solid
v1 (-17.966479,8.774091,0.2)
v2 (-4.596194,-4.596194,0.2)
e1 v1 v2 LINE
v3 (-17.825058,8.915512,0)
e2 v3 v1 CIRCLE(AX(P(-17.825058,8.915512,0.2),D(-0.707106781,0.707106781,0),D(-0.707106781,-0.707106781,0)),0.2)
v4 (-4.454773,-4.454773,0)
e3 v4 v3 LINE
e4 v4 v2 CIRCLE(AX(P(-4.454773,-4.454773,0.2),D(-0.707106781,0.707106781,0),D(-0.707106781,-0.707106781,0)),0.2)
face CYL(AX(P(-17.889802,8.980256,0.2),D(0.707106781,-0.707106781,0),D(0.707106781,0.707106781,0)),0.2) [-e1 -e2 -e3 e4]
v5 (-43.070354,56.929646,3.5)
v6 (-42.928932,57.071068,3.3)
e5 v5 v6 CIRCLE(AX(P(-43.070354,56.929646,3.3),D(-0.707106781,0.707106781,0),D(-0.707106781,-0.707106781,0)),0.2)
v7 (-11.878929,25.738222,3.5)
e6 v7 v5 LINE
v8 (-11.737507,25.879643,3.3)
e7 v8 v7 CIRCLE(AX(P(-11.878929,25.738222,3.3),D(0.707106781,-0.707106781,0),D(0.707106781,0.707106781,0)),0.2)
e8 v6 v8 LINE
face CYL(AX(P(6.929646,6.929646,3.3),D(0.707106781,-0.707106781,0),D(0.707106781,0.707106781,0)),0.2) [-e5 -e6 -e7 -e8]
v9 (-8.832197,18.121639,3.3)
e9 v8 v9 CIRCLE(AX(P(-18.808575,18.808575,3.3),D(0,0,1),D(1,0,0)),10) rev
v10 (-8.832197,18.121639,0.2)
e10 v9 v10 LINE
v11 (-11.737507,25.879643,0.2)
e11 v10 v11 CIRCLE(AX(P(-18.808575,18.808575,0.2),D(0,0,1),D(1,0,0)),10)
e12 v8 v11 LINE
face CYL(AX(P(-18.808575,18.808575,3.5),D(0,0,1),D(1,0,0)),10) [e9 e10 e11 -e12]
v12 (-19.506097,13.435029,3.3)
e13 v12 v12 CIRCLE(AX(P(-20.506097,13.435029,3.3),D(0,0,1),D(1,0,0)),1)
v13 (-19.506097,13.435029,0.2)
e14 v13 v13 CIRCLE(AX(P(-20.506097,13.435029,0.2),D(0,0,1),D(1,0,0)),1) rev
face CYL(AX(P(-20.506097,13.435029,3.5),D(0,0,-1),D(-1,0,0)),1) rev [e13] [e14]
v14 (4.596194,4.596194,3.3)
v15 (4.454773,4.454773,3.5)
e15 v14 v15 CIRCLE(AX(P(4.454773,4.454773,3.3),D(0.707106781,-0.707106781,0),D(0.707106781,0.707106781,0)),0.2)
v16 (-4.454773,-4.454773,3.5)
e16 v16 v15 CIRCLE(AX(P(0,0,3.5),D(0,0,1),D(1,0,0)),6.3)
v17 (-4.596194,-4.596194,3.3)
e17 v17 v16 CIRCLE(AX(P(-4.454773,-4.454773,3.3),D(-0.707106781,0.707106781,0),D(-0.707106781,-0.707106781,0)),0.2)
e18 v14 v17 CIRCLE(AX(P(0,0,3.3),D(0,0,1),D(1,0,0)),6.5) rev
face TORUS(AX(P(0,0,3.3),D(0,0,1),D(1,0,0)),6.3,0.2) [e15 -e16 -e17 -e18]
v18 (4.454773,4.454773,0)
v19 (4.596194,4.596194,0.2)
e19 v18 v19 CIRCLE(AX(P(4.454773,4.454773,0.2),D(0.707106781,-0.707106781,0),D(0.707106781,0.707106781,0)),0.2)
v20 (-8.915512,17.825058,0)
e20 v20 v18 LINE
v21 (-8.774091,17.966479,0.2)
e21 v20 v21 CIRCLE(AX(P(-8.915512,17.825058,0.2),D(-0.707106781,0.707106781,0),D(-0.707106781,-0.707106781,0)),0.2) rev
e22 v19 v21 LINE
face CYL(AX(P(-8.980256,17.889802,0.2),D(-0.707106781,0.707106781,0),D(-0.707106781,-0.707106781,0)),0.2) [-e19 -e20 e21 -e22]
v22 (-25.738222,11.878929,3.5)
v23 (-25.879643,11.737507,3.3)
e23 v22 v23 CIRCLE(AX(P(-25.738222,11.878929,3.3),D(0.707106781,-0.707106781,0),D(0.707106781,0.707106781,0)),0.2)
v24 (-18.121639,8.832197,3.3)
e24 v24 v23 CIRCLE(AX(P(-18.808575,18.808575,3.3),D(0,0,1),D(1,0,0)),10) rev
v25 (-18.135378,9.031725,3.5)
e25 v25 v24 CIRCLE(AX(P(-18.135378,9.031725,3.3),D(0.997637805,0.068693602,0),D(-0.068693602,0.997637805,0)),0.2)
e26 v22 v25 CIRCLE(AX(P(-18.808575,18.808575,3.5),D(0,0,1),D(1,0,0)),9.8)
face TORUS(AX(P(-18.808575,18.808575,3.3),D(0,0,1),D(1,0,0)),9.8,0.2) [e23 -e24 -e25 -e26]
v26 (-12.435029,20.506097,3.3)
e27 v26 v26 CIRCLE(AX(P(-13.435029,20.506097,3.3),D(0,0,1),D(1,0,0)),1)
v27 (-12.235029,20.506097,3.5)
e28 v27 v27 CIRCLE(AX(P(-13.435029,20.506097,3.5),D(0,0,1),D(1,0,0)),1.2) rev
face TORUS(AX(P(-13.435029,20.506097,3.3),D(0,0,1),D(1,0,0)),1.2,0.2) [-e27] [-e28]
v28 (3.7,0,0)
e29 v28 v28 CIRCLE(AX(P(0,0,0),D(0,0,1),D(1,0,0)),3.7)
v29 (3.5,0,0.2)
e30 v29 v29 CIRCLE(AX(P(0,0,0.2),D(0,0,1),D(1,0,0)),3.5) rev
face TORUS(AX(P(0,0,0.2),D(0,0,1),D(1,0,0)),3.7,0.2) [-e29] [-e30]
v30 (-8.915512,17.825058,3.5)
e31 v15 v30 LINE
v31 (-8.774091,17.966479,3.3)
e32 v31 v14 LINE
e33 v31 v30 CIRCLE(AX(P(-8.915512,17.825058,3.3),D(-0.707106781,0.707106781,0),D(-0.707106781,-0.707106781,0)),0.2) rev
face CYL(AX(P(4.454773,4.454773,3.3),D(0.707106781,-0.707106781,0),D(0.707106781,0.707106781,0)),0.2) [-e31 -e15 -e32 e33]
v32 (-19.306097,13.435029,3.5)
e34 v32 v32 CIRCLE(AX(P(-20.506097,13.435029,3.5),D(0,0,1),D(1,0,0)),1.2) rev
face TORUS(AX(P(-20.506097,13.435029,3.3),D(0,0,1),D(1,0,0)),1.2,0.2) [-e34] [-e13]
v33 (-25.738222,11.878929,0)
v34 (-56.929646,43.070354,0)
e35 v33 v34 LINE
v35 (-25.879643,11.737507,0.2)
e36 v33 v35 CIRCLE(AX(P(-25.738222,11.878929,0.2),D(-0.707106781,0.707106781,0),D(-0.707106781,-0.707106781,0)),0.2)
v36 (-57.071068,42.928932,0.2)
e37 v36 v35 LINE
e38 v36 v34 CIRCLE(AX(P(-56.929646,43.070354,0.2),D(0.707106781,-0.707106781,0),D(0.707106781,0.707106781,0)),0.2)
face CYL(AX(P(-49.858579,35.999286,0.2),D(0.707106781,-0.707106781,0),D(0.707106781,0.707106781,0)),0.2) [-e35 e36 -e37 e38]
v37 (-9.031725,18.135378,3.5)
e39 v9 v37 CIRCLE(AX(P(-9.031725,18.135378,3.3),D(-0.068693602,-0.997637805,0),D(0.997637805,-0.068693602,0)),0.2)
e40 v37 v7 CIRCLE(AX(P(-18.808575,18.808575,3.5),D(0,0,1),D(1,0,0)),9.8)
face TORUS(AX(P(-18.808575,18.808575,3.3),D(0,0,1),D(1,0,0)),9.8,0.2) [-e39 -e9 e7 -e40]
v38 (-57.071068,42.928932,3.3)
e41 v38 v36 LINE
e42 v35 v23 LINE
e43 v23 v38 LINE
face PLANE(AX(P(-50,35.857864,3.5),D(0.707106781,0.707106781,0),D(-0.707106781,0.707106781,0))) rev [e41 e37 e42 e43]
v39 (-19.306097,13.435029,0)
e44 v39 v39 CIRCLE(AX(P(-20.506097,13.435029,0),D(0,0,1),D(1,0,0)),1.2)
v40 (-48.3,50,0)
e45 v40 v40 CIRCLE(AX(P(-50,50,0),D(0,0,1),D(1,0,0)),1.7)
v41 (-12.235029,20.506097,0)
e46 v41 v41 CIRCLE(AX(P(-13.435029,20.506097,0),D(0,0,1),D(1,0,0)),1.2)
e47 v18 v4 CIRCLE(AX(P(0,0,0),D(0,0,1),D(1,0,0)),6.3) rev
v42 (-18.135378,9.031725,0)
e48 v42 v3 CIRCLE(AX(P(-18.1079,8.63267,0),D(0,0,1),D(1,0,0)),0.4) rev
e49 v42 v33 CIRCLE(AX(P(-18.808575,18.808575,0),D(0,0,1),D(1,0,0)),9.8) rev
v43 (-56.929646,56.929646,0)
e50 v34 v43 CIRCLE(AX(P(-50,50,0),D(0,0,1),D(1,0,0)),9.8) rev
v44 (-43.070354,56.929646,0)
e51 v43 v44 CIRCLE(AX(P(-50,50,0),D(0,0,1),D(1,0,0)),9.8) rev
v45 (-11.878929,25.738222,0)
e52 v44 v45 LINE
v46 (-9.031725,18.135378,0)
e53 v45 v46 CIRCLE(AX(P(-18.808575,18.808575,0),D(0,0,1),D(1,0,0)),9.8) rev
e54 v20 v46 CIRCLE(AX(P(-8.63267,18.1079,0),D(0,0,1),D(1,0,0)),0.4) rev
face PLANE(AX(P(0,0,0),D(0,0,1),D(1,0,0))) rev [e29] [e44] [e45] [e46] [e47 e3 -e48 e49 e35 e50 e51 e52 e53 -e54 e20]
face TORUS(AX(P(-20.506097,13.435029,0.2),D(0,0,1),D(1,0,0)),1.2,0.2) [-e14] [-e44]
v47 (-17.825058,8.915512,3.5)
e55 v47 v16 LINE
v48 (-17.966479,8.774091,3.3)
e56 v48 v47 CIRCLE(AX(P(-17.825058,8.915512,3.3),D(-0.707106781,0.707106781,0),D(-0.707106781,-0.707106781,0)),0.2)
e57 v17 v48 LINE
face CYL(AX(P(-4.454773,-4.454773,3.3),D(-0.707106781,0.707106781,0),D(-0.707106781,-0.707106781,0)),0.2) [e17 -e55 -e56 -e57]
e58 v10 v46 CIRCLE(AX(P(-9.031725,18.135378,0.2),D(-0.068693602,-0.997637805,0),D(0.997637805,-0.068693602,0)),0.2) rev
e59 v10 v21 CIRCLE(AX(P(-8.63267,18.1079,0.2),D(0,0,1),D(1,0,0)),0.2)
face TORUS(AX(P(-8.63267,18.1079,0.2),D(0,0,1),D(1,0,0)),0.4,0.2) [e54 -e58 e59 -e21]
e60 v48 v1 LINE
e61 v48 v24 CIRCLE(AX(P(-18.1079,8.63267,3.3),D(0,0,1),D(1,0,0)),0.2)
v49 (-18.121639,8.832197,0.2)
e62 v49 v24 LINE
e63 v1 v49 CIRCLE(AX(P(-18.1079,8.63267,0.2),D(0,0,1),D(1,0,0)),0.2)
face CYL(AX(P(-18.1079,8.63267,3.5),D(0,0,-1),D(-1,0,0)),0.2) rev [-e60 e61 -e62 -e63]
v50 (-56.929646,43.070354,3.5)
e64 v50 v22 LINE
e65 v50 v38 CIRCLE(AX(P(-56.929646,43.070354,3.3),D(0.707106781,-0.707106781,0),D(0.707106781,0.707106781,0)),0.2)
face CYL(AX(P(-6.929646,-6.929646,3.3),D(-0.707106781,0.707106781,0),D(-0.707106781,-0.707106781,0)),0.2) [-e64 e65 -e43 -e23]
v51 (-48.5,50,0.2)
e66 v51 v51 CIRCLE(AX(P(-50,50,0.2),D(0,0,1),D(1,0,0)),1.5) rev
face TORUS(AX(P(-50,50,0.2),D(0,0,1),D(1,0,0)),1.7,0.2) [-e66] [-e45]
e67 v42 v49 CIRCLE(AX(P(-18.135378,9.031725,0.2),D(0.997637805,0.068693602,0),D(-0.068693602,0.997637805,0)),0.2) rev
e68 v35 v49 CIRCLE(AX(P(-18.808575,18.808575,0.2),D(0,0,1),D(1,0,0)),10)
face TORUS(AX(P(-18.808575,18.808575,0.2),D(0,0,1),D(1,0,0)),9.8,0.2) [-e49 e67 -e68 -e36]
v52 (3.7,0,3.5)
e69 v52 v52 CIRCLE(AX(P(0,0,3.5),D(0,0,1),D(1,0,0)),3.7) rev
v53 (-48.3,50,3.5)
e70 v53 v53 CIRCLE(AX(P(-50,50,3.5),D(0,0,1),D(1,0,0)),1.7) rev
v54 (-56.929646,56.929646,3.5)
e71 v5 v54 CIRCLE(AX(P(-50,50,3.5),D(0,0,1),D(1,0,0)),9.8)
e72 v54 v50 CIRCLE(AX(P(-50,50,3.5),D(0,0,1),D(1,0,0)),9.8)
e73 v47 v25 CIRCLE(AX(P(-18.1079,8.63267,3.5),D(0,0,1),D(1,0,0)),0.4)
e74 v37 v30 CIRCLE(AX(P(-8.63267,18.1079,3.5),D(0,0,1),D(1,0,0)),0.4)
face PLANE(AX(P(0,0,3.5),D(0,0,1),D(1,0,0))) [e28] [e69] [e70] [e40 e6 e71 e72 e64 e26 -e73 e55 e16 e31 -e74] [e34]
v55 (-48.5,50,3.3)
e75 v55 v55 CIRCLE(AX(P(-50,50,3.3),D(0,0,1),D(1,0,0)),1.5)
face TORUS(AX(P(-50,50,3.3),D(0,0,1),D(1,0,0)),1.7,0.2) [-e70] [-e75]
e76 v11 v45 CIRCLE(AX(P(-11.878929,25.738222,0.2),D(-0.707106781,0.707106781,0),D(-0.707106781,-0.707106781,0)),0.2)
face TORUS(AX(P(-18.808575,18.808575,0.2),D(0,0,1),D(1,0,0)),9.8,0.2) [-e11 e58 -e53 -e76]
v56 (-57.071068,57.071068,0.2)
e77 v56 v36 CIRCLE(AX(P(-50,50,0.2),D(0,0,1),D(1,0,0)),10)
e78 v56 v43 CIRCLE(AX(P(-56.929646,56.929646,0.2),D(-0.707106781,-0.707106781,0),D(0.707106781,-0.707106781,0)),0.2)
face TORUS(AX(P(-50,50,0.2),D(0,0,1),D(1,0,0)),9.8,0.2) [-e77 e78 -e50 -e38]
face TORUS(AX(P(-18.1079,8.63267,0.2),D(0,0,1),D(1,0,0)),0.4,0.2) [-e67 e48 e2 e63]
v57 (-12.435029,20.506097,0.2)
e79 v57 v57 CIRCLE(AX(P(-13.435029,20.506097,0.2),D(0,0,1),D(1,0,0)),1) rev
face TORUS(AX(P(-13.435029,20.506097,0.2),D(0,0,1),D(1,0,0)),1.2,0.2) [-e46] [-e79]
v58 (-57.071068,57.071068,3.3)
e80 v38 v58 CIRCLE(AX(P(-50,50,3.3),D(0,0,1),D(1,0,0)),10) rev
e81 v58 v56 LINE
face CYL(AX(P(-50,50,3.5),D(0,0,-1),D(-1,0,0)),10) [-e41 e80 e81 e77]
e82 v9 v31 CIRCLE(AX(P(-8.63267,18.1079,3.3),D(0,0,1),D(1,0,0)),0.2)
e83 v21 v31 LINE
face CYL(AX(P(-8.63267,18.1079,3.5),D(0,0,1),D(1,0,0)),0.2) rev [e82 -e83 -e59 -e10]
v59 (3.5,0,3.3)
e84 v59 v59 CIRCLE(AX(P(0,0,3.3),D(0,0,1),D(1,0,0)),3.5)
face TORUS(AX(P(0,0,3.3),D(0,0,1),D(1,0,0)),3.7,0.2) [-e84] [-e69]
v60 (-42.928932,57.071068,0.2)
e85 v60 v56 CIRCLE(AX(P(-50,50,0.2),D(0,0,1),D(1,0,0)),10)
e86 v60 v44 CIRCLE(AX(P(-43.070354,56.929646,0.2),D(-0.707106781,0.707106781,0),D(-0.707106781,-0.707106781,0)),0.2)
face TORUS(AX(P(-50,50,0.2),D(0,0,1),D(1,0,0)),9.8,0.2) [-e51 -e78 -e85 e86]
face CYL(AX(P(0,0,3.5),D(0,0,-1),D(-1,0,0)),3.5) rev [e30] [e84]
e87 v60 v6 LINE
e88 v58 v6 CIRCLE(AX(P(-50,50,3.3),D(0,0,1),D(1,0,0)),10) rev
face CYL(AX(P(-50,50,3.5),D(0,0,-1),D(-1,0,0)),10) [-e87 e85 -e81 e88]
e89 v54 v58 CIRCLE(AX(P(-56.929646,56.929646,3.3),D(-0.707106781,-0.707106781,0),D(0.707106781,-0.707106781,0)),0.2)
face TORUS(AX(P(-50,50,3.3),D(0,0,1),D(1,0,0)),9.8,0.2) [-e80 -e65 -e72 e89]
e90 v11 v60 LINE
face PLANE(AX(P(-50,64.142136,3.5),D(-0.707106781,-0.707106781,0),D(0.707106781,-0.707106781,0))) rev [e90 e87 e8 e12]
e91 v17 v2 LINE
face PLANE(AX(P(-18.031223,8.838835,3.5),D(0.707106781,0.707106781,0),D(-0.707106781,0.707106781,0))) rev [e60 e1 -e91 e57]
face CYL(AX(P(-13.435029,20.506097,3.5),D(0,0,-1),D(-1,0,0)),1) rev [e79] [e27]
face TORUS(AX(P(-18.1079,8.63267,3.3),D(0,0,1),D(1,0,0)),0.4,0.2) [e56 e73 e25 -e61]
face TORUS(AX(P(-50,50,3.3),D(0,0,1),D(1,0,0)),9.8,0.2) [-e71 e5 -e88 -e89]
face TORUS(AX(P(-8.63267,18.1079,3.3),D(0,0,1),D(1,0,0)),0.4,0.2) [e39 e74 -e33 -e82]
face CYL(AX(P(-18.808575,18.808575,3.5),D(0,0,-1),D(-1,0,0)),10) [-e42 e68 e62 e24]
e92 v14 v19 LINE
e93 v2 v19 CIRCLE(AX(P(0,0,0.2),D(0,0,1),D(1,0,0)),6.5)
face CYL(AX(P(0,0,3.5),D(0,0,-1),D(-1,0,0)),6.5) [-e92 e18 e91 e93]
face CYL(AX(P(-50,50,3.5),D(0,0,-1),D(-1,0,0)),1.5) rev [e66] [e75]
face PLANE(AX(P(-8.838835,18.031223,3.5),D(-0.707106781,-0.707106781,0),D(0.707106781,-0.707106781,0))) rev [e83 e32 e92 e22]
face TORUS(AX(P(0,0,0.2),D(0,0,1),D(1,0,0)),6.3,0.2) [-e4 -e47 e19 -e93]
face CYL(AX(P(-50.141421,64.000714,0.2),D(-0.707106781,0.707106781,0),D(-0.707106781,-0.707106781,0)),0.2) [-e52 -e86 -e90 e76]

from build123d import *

# Parameters (mm, degrees)
SKETCH3_R           = 3.5
SKETCH3_R_2         = 1
SKETCH3_R_3         = 1.5
BOSS_EXTRUDE1_DEPTH = 3.5
FILLET1_R           = 10
FILLET2_R           = 0.2


with BuildPart() as part:
    # Sketch3 → Boss-Extrude1 (new body)
    with BuildSketch(Plane.XY):
        with BuildLine():
            Line((-50, 35.857864376), (-64.142135624, 50))
            Line((-64.142135624, 50), (-50, 64.142135624))
            Line((-50, 64.142135624), (-6.363961031, 20.506096654))
            Line((-6.363961031, 20.506096654), (-8.838834765, 18.03122292))
            Line((-8.838834765, 18.03122292), (4.596194078, 4.596194078))
            ThreePointArc((4.596194078, 4.596194078), (4.596194078, -4.596194078), (-4.596194078, -4.596194078))
            Line((-4.596194078, -4.596194078), (-18.03122292, 8.838834765))
            Line((-18.03122292, 8.838834765), (-20.506096654, 6.363961031))
            Line((-20.506096654, 6.363961031), (-50, 35.857864376))
        make_face()
        Circle(SKETCH3_R, mode=Mode.SUBTRACT)
        with Locations((-20.506096654, 13.435028843)):
            Circle(SKETCH3_R_2, mode=Mode.SUBTRACT)
        with Locations((-13.435028843, 20.506096654)):
            Circle(SKETCH3_R_2, mode=Mode.SUBTRACT)
        with Locations((-50, 50)):
            Circle(SKETCH3_R_3, mode=Mode.SUBTRACT)
    extrude(amount=BOSS_EXTRUDE1_DEPTH)

    # Fillet1
    # the kernel refuses this fillet: 10 mm, written as the material it takes off along each edge
    with BuildSketch(Plane(origin=(-20.506096654, 6.363961031, -18.998355192), x_dir=(-0.7071067811865481, 0.7071067811865469, 0), z_dir=(0, 0, 1))) as fillet1_piece_1:
        with BuildLine():
            CenterArc((7.599342077, -10), FILLET1_R, 90, 49.458398126)
            Line((0, -3.5), (-0.151986842, -3.37))
            ThreePointArc((-0.151986842, -3.37), (-0.2, -1.75), (-0.2, 0))
            Line((-0.2, 0), (0, 0.2))
            Line((0, 0.2), (7.599342077, 0.2))
            Line((7.599342077, 0.2), (7.599342077, 0))
        make_face()
    extrude(amount=41.496710384, mode=Mode.SUBTRACT)
    with BuildSketch(Plane(origin=(-6.363961031, 20.506096654, -18.998355192), x_dir=(-0.7071067811865438, -0.7071067811865513, 0), z_dir=(0, 0, 1))) as fillet1_piece_2:
        with BuildLine():
            CenterArc((10, -7.599342077), FILLET1_R, 130.541601874, 49.458398126)
            Line((0, -7.599342077), (-0.2, -7.599342077))
            Line((-0.2, -7.599342077), (-0.2, 0))
            Line((-0.2, 0), (0, 0.2))
            ThreePointArc((0, 0.2), (1.75, 0.2), (3.37, 0.151986842))
            Line((3.37, 0.151986842), (3.5, 0))
        make_face()
    extrude(amount=41.496710384, mode=Mode.SUBTRACT)
    with BuildSketch(Plane(origin=(-64.142135624, 50, -25), x_dir=(0.7071067811865476, -0.7071067811865476, 0), z_dir=(0, 0, 1))) as fillet1_piece_3:
        with BuildLine():
            CenterArc((FILLET1_R, FILLET1_R), FILLET1_R, 180, 90)
            Line((0, FILLET1_R), (-FILLET1_R * 0.02, FILLET1_R))
            Line((-FILLET1_R * 0.02, FILLET1_R), (-FILLET1_R * 0.02, -FILLET1_R * 0.02))
            Line((-FILLET1_R * 0.02, -FILLET1_R * 0.02), (FILLET1_R, -FILLET1_R * 0.02))
            Line((FILLET1_R, -FILLET1_R * 0.02), (FILLET1_R, 0))
        make_face()
    extrude(amount=53.5, mode=Mode.SUBTRACT)
    with BuildSketch(Plane(origin=(-50, 64.142135624, -25), x_dir=(0.7071067811865489, -0.7071067811865461, 0), z_dir=(0, 0, 1))) as fillet1_piece_4:
        with BuildLine():
            CenterArc((FILLET1_R, -FILLET1_R), FILLET1_R, 90, 90)
            Line((0, -FILLET1_R), (-FILLET1_R * 0.02, -FILLET1_R))
            Line((-FILLET1_R * 0.02, -FILLET1_R), (-FILLET1_R * 0.02, FILLET1_R * 0.02))
            Line((-FILLET1_R * 0.02, FILLET1_R * 0.02), (FILLET1_R, FILLET1_R * 0.02))
            Line((FILLET1_R, FILLET1_R * 0.02), (FILLET1_R, 0))
        make_face()
    extrude(amount=53.5, mode=Mode.SUBTRACT)

    # Fillet2
    fillet2_edges = [part.edges().sort_by_distance(p)[0] for p in [
        (-2.121320344, 11.313708499, 0),
        (4.596194078, -4.596194078, 0),
        (-11.313708499, 2.121320344, 0),
        (-8.838834765, 18.03122292, 1.75),
        (-18.03122292, 8.838834765, 1.75),
        (-11.313708499, 2.121320344, 3.5),
        (-3.5, 0, 0),
        (-3.5, 0, 3.5),
        (4.596194078, -4.596194078, 3.5),
        (-21.506096654, 13.435028843, 0),
        (-21.506096654, 13.435028843, 3.5),
        (-2.121320344, 11.313708499, 3.5),
        (-14.435028843, 20.506096654, 0),
        (-14.435028843, 20.506096654, 3.5),
        (-51.5, 50, 0),
        (-51.5, 50, 3.5),
        (-27.333219767, 41.475355391, 0),
        (-41.475355391, 27.333219767, 0),
        (-57.071067812, 57.071067812, 0),
        (-57.071067812, 57.071067812, 0),
        (-9.427918977, 22.273151555, 0),
        (-22.273151555, 9.427918977, 0),
        (-41.475355391, 27.333219767, 3.5),
        (-27.333219767, 41.475355391, 3.5),
        (-57.071067812, 57.071067812, 3.5),
        (-57.071067812, 57.071067812, 3.5),
        (-9.427918977, 22.273151555, 3.5),
        (-22.273151555, 9.427918977, 3.5),
    ]]
    fillet(fillet2_edges, radius=FILLET2_R)


solid = part.part
